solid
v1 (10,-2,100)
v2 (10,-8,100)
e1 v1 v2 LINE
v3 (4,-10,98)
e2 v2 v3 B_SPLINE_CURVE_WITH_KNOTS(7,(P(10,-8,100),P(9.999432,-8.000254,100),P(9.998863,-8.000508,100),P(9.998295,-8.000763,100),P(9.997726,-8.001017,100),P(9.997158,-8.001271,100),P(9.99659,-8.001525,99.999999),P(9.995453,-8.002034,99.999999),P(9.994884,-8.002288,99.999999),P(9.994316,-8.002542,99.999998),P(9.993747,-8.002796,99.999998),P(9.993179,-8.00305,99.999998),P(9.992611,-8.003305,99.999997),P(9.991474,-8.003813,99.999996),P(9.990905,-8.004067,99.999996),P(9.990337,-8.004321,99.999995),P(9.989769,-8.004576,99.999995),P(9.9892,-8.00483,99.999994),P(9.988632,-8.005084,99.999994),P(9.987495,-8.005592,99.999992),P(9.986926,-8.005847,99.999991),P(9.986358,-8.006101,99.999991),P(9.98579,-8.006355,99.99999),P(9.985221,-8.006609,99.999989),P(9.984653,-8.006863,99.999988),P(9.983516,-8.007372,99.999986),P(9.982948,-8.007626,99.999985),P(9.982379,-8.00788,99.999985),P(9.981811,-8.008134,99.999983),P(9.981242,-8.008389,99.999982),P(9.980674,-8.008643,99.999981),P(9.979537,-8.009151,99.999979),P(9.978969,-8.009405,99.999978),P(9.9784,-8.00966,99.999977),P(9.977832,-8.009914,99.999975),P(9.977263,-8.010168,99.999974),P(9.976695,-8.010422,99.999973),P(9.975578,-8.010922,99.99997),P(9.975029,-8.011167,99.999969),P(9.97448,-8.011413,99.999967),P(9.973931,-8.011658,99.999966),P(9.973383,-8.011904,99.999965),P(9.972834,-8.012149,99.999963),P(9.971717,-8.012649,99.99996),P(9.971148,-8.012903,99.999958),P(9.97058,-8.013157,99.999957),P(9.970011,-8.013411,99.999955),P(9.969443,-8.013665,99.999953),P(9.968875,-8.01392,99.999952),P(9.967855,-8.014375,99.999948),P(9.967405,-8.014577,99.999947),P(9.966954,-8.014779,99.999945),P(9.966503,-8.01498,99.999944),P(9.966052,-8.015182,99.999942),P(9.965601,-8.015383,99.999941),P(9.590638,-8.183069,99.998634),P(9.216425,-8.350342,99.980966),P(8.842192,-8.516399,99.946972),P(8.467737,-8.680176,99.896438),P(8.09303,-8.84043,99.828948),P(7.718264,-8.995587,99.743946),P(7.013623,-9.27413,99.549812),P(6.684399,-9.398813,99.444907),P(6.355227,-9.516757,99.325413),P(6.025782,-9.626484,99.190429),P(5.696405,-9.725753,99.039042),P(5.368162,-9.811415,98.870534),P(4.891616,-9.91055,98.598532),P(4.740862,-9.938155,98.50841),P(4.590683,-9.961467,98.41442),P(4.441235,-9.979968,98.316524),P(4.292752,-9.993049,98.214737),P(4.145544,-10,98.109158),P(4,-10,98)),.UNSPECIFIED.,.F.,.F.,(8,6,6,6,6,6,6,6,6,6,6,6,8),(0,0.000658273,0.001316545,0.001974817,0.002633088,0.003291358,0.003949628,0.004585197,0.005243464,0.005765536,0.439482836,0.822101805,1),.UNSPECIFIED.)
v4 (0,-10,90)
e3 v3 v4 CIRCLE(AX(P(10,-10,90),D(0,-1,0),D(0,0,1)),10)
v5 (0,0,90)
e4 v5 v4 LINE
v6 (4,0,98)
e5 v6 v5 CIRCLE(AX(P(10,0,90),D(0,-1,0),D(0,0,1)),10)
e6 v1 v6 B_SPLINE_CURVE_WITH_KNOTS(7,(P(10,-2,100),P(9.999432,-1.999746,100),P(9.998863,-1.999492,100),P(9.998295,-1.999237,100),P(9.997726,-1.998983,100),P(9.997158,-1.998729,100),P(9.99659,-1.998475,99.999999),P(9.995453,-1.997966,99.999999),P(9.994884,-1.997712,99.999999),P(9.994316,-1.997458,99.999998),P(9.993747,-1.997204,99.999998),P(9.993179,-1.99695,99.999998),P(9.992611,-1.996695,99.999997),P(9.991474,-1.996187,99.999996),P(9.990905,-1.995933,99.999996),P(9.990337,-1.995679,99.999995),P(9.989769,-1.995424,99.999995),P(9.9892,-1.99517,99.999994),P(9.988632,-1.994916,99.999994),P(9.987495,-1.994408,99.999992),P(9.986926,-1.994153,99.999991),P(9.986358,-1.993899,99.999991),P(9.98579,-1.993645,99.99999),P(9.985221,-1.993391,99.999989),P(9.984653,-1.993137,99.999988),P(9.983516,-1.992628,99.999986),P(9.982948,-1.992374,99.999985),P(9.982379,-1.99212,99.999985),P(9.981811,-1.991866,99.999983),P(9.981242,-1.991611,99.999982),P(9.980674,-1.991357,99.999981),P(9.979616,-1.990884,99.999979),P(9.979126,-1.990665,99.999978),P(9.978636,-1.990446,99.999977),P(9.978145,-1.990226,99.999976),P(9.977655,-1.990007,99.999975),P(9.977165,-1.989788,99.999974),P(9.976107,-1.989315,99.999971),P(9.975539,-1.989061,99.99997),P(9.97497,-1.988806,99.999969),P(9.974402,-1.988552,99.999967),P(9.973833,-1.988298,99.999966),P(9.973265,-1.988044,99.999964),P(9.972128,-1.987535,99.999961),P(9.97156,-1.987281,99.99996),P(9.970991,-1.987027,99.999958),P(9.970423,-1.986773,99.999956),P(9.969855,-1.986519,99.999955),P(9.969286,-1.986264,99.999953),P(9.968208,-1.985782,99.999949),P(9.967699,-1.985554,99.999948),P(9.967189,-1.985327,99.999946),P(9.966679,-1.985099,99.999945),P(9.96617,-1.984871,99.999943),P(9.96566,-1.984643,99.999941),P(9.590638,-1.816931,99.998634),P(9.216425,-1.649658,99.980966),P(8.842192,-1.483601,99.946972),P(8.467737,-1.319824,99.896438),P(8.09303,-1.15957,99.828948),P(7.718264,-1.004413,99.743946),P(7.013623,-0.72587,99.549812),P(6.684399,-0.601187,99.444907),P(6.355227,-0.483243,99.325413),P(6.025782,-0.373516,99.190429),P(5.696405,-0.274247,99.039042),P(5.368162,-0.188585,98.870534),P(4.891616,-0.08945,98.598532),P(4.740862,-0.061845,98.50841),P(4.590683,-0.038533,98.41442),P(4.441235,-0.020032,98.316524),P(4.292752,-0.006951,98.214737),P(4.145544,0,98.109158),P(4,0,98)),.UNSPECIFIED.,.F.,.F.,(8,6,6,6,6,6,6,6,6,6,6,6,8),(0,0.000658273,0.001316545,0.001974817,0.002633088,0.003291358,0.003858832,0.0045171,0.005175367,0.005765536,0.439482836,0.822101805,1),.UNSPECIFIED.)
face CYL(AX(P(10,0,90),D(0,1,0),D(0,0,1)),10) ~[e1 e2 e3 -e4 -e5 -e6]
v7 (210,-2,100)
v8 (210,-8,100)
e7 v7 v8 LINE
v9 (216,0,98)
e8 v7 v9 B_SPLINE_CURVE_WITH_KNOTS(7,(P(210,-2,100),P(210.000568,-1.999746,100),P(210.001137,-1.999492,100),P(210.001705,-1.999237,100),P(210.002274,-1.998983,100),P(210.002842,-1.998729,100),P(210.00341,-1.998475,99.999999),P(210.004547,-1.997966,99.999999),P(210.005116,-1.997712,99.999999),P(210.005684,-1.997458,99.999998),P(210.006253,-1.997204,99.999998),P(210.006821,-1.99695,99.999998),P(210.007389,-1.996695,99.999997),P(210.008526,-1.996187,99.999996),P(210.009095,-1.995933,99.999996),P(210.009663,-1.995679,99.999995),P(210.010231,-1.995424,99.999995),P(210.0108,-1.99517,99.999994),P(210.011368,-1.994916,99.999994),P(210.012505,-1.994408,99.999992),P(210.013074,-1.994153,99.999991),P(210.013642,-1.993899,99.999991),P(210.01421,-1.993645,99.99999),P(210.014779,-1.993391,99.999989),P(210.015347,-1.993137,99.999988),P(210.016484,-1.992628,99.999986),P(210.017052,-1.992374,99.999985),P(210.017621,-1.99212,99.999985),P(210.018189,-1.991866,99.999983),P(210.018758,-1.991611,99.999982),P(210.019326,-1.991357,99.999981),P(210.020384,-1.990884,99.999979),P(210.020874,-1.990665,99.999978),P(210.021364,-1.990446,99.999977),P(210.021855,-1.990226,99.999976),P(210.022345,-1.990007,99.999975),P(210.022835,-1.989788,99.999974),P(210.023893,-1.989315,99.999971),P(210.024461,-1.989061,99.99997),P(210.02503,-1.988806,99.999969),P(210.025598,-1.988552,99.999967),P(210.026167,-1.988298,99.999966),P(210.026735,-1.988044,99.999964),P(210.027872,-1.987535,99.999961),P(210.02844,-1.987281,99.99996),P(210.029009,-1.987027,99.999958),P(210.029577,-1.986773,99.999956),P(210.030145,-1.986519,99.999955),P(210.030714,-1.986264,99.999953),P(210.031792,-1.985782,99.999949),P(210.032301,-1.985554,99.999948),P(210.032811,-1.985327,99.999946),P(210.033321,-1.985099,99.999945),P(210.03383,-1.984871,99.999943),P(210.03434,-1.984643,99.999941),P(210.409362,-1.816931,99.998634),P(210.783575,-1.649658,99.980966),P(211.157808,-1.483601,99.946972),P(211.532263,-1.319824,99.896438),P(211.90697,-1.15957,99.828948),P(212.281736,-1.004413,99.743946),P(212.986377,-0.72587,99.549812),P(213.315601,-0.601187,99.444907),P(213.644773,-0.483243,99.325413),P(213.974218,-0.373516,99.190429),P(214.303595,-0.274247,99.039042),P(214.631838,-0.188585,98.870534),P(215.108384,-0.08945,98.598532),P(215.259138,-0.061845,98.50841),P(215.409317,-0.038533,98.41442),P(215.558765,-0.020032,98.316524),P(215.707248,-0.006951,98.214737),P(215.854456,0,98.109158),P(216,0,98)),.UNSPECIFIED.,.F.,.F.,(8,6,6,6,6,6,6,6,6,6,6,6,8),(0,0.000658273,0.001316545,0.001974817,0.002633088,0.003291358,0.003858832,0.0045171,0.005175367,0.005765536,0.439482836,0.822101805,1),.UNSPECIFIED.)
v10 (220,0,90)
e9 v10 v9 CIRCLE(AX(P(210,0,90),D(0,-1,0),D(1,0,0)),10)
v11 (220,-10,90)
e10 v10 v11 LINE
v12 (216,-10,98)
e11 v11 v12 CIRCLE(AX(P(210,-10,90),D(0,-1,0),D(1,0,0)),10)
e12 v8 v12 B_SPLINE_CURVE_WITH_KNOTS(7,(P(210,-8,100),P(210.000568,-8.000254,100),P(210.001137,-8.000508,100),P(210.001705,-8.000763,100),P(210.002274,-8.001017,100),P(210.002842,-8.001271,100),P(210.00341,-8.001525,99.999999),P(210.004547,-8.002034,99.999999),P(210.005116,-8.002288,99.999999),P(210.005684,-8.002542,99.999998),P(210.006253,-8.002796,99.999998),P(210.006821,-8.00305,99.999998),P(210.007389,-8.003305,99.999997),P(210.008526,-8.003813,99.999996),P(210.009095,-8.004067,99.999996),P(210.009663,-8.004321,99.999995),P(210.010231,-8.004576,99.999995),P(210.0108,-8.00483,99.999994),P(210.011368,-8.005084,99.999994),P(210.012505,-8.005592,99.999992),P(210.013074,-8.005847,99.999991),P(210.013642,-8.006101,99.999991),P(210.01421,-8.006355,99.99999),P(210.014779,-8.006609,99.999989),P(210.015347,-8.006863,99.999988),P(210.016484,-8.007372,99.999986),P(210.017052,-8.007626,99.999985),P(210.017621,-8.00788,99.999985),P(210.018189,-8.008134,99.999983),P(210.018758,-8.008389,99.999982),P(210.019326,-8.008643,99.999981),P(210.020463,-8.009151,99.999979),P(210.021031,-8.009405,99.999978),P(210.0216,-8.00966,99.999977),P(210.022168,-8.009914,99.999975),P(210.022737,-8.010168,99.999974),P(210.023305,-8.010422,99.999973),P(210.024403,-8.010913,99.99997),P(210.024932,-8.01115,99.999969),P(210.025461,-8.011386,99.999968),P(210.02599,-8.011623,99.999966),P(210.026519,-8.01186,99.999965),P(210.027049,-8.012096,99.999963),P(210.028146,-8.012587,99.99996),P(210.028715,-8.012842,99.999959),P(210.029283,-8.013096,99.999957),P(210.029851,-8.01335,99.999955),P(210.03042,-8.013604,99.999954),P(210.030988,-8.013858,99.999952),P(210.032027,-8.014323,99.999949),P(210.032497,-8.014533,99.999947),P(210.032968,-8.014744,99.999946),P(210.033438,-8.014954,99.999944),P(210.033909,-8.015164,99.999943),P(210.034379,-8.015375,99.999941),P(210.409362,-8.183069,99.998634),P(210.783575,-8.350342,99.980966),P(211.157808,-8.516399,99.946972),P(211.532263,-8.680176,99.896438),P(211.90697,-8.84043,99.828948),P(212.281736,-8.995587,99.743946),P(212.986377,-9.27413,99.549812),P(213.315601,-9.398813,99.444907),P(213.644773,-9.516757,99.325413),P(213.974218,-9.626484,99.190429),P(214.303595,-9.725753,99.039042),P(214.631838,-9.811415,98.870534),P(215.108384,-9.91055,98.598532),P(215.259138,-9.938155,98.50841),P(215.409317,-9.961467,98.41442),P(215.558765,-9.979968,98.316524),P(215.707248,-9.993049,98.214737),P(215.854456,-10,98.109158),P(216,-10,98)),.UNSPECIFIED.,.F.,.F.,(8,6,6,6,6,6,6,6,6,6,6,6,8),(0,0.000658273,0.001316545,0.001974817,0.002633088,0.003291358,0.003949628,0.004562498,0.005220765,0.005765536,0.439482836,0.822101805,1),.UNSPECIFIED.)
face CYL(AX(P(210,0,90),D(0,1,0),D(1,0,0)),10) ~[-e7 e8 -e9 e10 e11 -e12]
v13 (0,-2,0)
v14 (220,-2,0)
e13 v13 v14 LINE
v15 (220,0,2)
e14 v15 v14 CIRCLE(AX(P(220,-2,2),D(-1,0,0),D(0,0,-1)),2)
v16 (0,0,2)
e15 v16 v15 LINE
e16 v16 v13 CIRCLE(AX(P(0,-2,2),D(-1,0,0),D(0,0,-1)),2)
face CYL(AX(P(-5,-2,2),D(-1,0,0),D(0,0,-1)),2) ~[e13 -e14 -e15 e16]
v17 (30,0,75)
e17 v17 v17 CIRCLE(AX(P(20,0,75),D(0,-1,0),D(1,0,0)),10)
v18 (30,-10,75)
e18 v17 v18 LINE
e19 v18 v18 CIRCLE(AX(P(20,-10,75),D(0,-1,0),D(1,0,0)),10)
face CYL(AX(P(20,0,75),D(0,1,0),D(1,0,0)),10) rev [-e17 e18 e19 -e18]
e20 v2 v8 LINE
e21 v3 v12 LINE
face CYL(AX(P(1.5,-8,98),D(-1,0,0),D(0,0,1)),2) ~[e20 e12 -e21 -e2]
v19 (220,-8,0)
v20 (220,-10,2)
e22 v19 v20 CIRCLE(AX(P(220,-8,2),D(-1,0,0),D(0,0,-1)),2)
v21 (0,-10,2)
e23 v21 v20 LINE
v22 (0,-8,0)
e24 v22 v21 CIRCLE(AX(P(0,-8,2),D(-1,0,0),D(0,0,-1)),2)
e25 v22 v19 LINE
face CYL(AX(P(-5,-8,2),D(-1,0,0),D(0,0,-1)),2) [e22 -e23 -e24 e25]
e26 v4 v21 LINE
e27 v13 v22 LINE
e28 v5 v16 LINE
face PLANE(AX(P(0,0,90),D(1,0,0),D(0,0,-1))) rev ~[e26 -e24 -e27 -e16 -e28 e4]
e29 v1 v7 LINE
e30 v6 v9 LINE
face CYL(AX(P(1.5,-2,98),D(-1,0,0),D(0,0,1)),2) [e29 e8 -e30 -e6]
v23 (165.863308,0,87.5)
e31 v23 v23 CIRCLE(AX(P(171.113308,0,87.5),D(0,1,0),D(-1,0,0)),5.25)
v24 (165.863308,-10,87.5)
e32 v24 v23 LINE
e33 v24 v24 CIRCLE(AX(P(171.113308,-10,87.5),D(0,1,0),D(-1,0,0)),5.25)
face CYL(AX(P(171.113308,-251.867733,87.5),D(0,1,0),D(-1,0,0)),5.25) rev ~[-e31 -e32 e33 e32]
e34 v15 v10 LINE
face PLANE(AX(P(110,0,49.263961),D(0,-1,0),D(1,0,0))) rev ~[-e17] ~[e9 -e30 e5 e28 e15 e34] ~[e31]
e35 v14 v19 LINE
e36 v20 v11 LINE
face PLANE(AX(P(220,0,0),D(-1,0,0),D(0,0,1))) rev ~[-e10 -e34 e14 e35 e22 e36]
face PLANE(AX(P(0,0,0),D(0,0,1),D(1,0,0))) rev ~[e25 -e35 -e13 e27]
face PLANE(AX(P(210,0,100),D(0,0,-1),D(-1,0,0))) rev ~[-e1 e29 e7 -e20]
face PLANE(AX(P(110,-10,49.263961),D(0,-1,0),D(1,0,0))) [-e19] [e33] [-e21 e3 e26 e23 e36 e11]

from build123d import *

# Parameters (mm, degrees)
F0_R        = 10
F1_DEPTH    = 10
F2_T1_DEPTH = 217
F2_T3_DEPTH = 230
F4_D        = 10.5


# Not quite as in the source:
# - a fillet or chamfer that OpenCascade refuses, or shapes differently, is made with other operations: its cross-section is extruded or revolved along the edge and cut away or added


with BuildPart() as f1:
    # F0 (on Front) → F1 (new body)
    with BuildSketch(Plane.XZ):
        with BuildLine():
            Line((0, 90), (0, 0))
            Line((0, 0), (220, 0))
            Line((220, 0), (220, 90))
            ThreePointArc((220, 90), (217.0710678119, 97.0710678119), (210, 100))
            Line((210, 100), (10, 100))
            ThreePointArc((10, 100), (2.9289321881, 97.0710678119), (0, 90))
        make_face()
        with Locations((20, 75)):
            Circle(F0_R, mode=Mode.SUBTRACT)
    extrude(amount=F1_DEPTH)

    # F2: fillet of radius 2 on 4 edges, made by hand

    # F2_s2 → F2_t1 (cut)
    with BuildSketch(Plane.YZ.offset(1.5)):
        with BuildLine():
            ThreePointArc((-8, 100), (-9.4142135624, 99.4142135624), (-10, 98))
            Line((-10, 98), (-10, 100))
            Line((-10, 100), (-8, 100))
        make_face()
        with BuildLine():
            ThreePointArc((-2, 100), (-0.5857864376, 99.4142135624), (0, 98))
            Line((0, 98), (0, 100))
            Line((0, 100), (-2, 100))
        make_face()
    extrude(amount=F2_T1_DEPTH, mode=Mode.SUBTRACT)

    # F2_s4 → F2_t3 (cut)
    with BuildSketch(Plane.YZ.offset(-5)):
        with BuildLine():
            ThreePointArc((-8, 0), (-9.4142135624, 0.5857864376), (-10, 2))
            Line((-10, 2), (-10, 0))
            Line((-10, 0), (-8, 0))
        make_face()
        with BuildLine():
            ThreePointArc((-2, 0), (-0.5857864376, 0.5857864376), (0, 2))
            Line((0, 2), (0, 0))
            Line((0, 0), (-2, 0))
        make_face()
    extrude(amount=F2_T3_DEPTH, mode=Mode.SUBTRACT)

    # F4 (through all)
    with Locations(Plane.XZ.offset(10)):
        with Locations((171.1133077741, 87.5)):
            Hole(F4_D / 2)


solid = f1.part
